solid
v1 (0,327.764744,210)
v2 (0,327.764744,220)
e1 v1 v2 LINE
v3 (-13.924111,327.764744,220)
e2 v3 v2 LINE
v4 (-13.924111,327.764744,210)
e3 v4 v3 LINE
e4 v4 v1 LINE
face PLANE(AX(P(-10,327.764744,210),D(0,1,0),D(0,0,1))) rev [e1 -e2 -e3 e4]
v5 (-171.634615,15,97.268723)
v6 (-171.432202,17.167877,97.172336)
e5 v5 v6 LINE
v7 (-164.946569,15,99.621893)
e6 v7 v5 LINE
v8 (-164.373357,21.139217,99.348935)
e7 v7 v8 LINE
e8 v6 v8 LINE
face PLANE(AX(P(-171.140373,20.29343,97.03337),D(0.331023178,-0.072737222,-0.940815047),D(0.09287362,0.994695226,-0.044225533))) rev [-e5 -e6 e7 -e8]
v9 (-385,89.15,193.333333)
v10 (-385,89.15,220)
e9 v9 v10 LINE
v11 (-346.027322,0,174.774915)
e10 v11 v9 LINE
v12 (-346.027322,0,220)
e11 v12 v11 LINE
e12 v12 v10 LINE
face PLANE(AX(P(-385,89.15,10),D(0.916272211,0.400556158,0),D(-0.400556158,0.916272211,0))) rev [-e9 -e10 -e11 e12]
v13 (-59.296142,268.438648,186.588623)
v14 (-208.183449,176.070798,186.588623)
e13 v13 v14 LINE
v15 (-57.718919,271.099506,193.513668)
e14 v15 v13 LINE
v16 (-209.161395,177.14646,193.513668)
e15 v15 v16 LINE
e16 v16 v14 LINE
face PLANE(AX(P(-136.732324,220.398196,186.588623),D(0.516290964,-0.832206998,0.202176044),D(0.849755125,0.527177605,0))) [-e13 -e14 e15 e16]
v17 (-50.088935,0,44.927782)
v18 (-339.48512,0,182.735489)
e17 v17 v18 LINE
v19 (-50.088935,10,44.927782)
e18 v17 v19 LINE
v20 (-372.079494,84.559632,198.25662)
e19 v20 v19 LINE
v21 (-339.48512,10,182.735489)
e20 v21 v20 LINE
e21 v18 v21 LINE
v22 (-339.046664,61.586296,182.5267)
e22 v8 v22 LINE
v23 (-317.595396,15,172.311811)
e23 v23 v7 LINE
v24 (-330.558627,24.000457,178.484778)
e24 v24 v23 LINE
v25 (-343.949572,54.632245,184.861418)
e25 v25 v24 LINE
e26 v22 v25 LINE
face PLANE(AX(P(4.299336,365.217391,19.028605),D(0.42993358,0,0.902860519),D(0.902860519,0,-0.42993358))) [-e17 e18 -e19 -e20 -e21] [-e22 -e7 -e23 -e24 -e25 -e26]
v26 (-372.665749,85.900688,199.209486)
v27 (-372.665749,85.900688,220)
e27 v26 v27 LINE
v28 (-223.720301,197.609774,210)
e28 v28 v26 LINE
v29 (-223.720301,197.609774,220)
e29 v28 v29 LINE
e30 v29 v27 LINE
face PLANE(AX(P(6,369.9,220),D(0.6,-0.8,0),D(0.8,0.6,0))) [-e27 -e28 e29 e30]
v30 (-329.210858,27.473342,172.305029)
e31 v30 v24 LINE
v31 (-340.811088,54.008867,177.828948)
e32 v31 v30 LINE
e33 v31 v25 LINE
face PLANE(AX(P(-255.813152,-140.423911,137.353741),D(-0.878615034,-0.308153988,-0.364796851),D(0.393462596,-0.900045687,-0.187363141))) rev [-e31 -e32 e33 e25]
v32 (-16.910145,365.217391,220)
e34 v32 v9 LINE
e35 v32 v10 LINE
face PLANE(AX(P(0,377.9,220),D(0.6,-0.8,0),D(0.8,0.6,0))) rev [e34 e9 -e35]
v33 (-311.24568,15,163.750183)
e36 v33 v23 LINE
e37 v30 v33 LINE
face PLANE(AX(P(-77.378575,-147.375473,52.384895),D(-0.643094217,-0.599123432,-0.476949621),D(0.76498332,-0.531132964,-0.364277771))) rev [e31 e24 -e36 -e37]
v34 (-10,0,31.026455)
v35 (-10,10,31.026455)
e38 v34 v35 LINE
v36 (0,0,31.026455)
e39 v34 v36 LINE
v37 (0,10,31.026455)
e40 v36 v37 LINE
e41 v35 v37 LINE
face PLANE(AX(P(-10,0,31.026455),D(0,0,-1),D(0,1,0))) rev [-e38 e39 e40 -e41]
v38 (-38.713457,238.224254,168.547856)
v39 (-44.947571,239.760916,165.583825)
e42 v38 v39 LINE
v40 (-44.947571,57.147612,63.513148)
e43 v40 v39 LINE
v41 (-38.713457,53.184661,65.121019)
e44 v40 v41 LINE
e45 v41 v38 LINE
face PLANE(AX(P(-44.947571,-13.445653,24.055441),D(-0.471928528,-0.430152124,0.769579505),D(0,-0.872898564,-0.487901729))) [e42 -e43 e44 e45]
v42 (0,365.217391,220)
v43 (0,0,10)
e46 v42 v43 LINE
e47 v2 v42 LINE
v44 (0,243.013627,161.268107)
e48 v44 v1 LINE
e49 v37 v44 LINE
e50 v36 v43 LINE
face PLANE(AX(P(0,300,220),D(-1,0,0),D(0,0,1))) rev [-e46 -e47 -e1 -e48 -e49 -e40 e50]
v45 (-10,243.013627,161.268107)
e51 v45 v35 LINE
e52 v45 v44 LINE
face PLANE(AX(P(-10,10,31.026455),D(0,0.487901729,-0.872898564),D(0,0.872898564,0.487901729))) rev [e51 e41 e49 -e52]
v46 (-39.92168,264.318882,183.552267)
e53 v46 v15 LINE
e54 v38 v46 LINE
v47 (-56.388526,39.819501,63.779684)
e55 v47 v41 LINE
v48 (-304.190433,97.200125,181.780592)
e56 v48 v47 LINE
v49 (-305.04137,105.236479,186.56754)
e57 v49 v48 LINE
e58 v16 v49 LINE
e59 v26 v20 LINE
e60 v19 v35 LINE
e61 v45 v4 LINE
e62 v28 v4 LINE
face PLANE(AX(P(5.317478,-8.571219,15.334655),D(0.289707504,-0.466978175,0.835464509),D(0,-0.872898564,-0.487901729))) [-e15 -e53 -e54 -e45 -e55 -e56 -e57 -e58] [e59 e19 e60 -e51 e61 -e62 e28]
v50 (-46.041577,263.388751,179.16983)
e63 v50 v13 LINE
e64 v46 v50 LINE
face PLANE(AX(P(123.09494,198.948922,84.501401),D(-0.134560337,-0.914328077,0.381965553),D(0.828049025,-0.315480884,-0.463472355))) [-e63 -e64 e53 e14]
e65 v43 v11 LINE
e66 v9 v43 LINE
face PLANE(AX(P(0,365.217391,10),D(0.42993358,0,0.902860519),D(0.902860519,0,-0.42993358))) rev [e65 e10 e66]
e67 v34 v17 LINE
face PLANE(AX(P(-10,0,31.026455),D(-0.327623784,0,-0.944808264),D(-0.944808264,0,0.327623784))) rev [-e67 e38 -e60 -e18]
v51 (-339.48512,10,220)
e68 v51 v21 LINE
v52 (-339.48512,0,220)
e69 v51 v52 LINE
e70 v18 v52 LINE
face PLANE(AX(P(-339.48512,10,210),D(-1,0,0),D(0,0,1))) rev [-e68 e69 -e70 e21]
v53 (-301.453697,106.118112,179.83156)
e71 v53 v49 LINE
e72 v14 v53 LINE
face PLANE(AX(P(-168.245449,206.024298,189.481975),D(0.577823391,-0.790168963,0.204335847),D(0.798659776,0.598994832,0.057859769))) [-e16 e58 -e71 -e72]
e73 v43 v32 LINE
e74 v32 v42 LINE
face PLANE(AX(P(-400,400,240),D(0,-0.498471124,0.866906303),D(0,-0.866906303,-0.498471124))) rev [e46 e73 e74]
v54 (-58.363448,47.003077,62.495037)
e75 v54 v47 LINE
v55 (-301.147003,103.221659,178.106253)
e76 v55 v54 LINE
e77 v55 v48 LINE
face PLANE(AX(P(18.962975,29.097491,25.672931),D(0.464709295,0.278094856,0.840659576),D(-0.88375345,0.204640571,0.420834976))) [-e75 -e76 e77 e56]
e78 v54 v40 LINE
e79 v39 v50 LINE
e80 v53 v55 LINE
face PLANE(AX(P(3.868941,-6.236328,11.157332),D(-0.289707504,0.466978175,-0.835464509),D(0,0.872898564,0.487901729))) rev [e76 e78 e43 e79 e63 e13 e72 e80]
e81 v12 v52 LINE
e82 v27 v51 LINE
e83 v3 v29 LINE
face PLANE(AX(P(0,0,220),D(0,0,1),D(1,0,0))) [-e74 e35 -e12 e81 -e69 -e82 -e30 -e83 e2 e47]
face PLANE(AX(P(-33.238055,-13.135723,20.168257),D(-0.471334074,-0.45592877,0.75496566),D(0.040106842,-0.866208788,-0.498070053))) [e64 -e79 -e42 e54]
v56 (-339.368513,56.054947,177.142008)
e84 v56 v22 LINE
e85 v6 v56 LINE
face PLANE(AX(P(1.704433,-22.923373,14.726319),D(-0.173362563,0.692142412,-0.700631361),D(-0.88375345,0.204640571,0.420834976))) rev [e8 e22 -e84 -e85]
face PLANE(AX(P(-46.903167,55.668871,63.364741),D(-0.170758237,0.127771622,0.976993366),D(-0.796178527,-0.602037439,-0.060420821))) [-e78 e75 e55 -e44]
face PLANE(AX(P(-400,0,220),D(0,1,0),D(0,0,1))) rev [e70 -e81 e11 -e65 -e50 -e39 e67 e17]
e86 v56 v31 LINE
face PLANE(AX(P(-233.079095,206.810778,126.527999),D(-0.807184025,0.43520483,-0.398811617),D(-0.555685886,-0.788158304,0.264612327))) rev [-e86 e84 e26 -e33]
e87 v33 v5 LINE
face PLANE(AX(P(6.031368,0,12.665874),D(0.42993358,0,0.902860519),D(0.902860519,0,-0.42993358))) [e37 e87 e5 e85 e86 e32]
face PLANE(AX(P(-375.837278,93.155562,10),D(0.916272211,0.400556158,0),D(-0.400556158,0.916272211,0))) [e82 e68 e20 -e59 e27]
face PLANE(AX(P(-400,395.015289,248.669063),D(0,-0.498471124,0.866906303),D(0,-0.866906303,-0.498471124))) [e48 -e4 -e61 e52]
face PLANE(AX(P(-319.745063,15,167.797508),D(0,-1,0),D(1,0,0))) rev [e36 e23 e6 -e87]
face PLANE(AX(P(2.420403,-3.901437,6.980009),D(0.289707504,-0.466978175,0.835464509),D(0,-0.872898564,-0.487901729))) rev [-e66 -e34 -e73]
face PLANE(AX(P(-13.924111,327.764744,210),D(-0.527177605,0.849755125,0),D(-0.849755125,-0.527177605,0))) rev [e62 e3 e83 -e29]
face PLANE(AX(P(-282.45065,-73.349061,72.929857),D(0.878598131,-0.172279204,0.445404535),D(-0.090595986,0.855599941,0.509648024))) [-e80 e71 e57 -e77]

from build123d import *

# Parameters (mm, degrees)
BOSS_EXTRU_1_DEPTH       = 220
ENL_V_MAT_EXTRU_1_DEPTH  = 593.628391152
ENL_V_MAT_EXTRU_7_DEPTH  = 585.622735541
ENL_V_MAT_EXTRU_8_DEPTH  = 581.933509888
ENL_V_MAT_EXTRU_9_DEPTH  = 576.952076714
COQUE2_T                 = 10
ENL_V_MAT_EXTRU_10_DEPTH = 10
ENL_V_MAT_EXTRU_11_DEPTH = 10
ENL_V_MAT_EXTRU_12_DEPTH = 10
ENL_V_MAT_EXTRU_13_DEPTH = 5
ENL_V_MAT_EXTRU_14_DEPTH = 5
CHANFREIN1_SIZE          = 5


with BuildPart() as part:
    # Esquisse1 → Boss.-Extru.1 (new body)
    with BuildSketch(Plane.XY):
        Polygon((0, 0), (0, 300), (0, 377.9), (-400, 77.9), (-400, 0), align=None)
    extrude(amount=BOSS_EXTRU_1_DEPTH)

    # Esquisse2 → Enlèv. mat.-Extru.1 (cut, through all)
    with BuildSketch(Plane(origin=(0, 0, 0), x_dir=(0, 0, -1), z_dir=(1, 0, 0))):
        Polygon((-240, 400), (-10, 0), (0, 0), (0, 377.9), (0, 400), align=None)
    extrude(amount=-ENL_V_MAT_EXTRU_1_DEPTH, mode=Mode.SUBTRACT)

    # Esquisse9 → Enlèv. mat.-Extru.7 (cut, through all)
    with BuildSketch(Plane(origin=(0, 0, 0), x_dir=(-1, 0, 0), z_dir=(0, -1, 0))):
        Polygon((0, -10), (546, -270), (546, -10), align=None)
    extrude(amount=-ENL_V_MAT_EXTRU_7_DEPTH, mode=Mode.SUBTRACT)

    # Esquisse10 → Enlèv. mat.-Extru.8 (cut, through all)
    with BuildSketch(Plane.XY.offset(220)):
        Polygon((-400, 77.9), (-385, 89.15), (15, -825.85), (-400, -825.85), align=None)
    extrude(amount=-ENL_V_MAT_EXTRU_8_DEPTH, mode=Mode.SUBTRACT)

    # Esquisse11 → Enlèv. mat.-Extru.9 (cut, through all)
    with BuildSketch(Plane(origin=(2.420403375, -3.901436921, 6.980009459), x_dir=(-0.957115229324862, -0.14134879209424664, 0.25288526403868283), z_dir=(-0.2897075038628045, 0.46697817542256076, -0.8354645090514613))):
        Polygon((411.522876563, 185.157287383), (386.822778124, 107.338380422), (375.386020672, 85.272983458), (2.52885264, 4.879017292), (4.011720976, 426.13611676), (20.196678216, 426.13611676), align=None)
    extrude(amount=ENL_V_MAT_EXTRU_9_DEPTH, mode=Mode.SUBTRACT)

    # Coque2 (no face opened: a closed hollow body)
    add(offset(amount=-COQUE2_T, mode=Mode.PRIVATE), mode=Mode.SUBTRACT)

    # Esquisse12 → Enlèv. mat.-Extru.10 (cut)
    with BuildSketch(Plane(origin=(0, 0, 0), x_dir=(0, 0, -1), z_dir=(1, 0, 0))):
        Polygon((-220, 0), (-31.026454867, 0), (-31.026454867, 10), (-161.268107242, 243.013626517), (-210, 327.764744356), (-220, 327.764744356), align=None)
    extrude(amount=-ENL_V_MAT_EXTRU_10_DEPTH, mode=Mode.SUBTRACT)

    # Esquisse13 → Enlèv. mat.-Extru.11 (cut)
    with BuildSketch(Plane.XY.offset(220)):
        Polygon((-10, 327.764744356), (-13.924111282, 327.764744356), (-223.720300682, 197.609774488), (-372.665748674, 85.900688494), (-339.485119824, 10), (-339.485119824, 0), (0, 0), (0, 327.764744356), align=None)
    extrude(amount=-ENL_V_MAT_EXTRU_11_DEPTH, mode=Mode.SUBTRACT)

    # Esquisse14 → Enlèv. mat.-Extru.12 (cut)
    with BuildSketch(Plane(origin=(0, 10, 0), x_dir=(1, 0, 0), z_dir=(0, 1, 0))):
        Polygon((-10, -31.026454867), (-50.088935394, -44.927781949), (-339.485119824, -182.735488821), (-339.485119824, -210), (-10, -210), align=None)
    extrude(amount=-ENL_V_MAT_EXTRU_12_DEPTH, mode=Mode.SUBTRACT)

    # Esquisse15 → Enlèv. mat.-Extru.13 (cut)
    with BuildSketch(Plane(origin=(5.317478413, -8.571218675, 15.334654549), x_dir=(0.957115229324862, 0.14134879209424633, -0.25288526403868294), z_dir=(0.2897075038628044, -0.4669781754225606, 0.8354645090514614))):
        Polygon((-47.266156251, 320.279040761), (-65.860823636, 331.058022207), (-224.088873852, 249.046543535), (-324.264873355, 182.887396388), (-323.375809314, 173.536914552), (-64.470820642, 65.876603428), (-46.003797604, 78.19747196), (-46.003797604, 290.180399582), align=None)
    extrude(amount=-ENL_V_MAT_EXTRU_13_DEPTH, mode=Mode.SUBTRACT)

    # Esquisse16 → Enlèv. mat.-Extru.14 (cut)
    with BuildSketch(Plane(origin=(8.181036358, 0, 17.180176353), x_dir=(0.9028605188239304, 0, -0.4299335803923476), z_dir=(0.4299335803923476, 0, 0.9028605188239304))):
        Polygon((-191.754542227, 15), (-191.119657804, 21.139217145), (-384.586204292, 61.586295788), (-390.01662066, 54.63224463), (-375.184932722, 24.000456874), (-360.826977231, 15), align=None)
    extrude(amount=-ENL_V_MAT_EXTRU_14_DEPTH, mode=Mode.SUBTRACT)

    # Chanfrein1
    # the kernel refuses this chamfer: 5 mm, written as the material it adds along each edge
    with BuildSketch(Plane(origin=(-40.161994399, 44.295460011, 54.670053412), x_dir=(0.3159146926025526, -0.462915109925161, 0.8281953320327342), z_dir=(0, 0.8728985637819059, 0.48790172919091623))) as chanfrein1_piece_1_section:
        Polygon((CHANFREIN1_SIZE * 0.999621916911, -CHANFREIN1_SIZE * 0.0274958766106), (-CHANFREIN1_SIZE * 0.0274958766106, -CHANFREIN1_SIZE * 0.999621916911), (0, 0), align=None)
    chanfrein1_piece_1 = extrude(amount=237.699757502, mode=Mode.PRIVATE)
    chanfrein1_piece_1 = split(chanfrein1_piece_1, bisect_by=Plane(origin=(-40.208550671, 46.8969516, 62.124981095), z_dir=(-0.2897075038628046, 0.46697817542256076, -0.8354645090514613)), keep=Keep.TOP, mode=Mode.PRIVATE)
    add(chanfrein1_piece_1)
    with BuildSketch(Plane(origin=(-68.07465725, 34.413144895, 58.825445246), x_dir=(0.30420367327836906, -0.4846099980151233, 0.8201300354137321), z_dir=(0.7961785265635489, 0.602037439248781, 0.060420820764590655))) as chanfrein1_piece_2_section:
        Polygon((CHANFREIN1_SIZE * 0.999621916911, -CHANFREIN1_SIZE * 0.0274958766106), (-CHANFREIN1_SIZE * 0.0274958766106, -CHANFREIN1_SIZE * 0.999621916911), (0, 0), align=None)
    chanfrein1_piece_2 = extrude(amount=47.916711439, mode=Mode.PRIVATE)
    chanfrein1_piece_2 = split(chanfrein1_piece_2, bisect_by=Plane(origin=(-62.751981741, 36.64687929, 64.212970543), z_dir=(-0.2897075038628046, 0.46697817542256076, -0.8354645090514613)), keep=Keep.TOP, mode=Mode.PRIVATE)
    add(chanfrein1_piece_2)
    with BuildSketch(Plane(origin=(-317.002639554, 102.166369021, 183.014540357), x_dir=(0.27949349185715106, -0.4904553232059303, 0.8254313805207935), z_dir=(0.8837534495057562, -0.20464057148945075, -0.42083497595512176))) as chanfrein1_piece_3_section:
        Polygon((CHANFREIN1_SIZE * 0.999621916911, -CHANFREIN1_SIZE * 0.0274958766106), (-CHANFREIN1_SIZE * 0.0274958766106, -CHANFREIN1_SIZE * 0.999621916911), (0, 0), align=None)
    chanfrein1_piece_3 = extrude(amount=306.113933558, mode=Mode.PRIVATE)
    chanfrein1_piece_3 = split(chanfrein1_piece_3, bisect_by=Plane(origin=(-309.662798292, 99.962525559, 185.222229721), z_dir=(-0.2897075038628046, 0.46697817542256076, -0.8354645090514613)), keep=Keep.TOP, mode=Mode.PRIVATE)
    add(chanfrein1_piece_3)
    with BuildSketch(Plane(origin=(-307.65482851, 118.573028738, 188.943482833), x_dir=(0.2633994072478335, -0.4729425091279115, 0.8408008892248422), z_dir=(0.09059598606414514, -0.8555999408705789, -0.5096480241218712))) as chanfrein1_piece_4_section:
        Polygon((CHANFREIN1_SIZE * 0.999621916911, -CHANFREIN1_SIZE * 0.0274958766106), (-CHANFREIN1_SIZE * 0.0274958766106, -CHANFREIN1_SIZE * 0.999621916911), (0, 0), align=None)
    chanfrein1_piece_4 = extrude(amount=35.10948368, mode=Mode.PRIVATE)
    chanfrein1_piece_4 = split(chanfrein1_piece_4, bisect_by=Plane(origin=(-304.154916551, 111.450481176, 189.733432581), z_dir=(-0.2897075038628046, 0.46697817542256076, -0.8354645090514613)), keep=Keep.TOP, mode=Mode.PRIVATE)
    add(chanfrein1_piece_4)
    with BuildSketch(Plane(origin=(-200.340434194, 187.183474827, 190.080330196), x_dir=(0.27509504551843234, -0.44891584015791836, 0.8501748551836392), z_dir=(-0.7986597762217562, -0.5989948321663171, -0.05785976912726176))) as chanfrein1_piece_5_section:
        Polygon((CHANFREIN1_SIZE * 0.999621916911, -CHANFREIN1_SIZE * 0.0274958766106), (-CHANFREIN1_SIZE * 0.0274958766106, -CHANFREIN1_SIZE * 0.999621916911), (0, 0), align=None)
    chanfrein1_piece_5 = extrude(amount=145.767917453, mode=Mode.PRIVATE)
    chanfrein1_piece_5 = split(chanfrein1_piece_5, bisect_by=Plane(origin=(-202.533814806, 181.753905632, 193.790779261), z_dir=(-0.2897075038628046, 0.46697817542256076, -0.8354645090514613)), keep=Keep.TOP, mode=Mode.PRIVATE)
    add(chanfrein1_piece_5)
    with BuildSketch(Plane(origin=(-48.240952428, 280.213064842, 189.336345276), x_dir=(0.2774877365282881, -0.4472811894008833, 0.8502588392275253), z_dir=(-0.8497551250873772, -0.5271776051652194, 0))) as chanfrein1_piece_6_section:
        Polygon((CHANFREIN1_SIZE * 0.999621916911, -CHANFREIN1_SIZE * 0.0274958766106), (-CHANFREIN1_SIZE * 0.0274958766106, -CHANFREIN1_SIZE * 0.999621916911), (0, 0), align=None)
    chanfrein1_piece_6 = extrude(amount=203.93579214, mode=Mode.PRIVATE)
    chanfrein1_piece_6 = split(chanfrein1_piece_6, bisect_by=Plane(origin=(-51.141678834, 273.639790239, 192.652807431), z_dir=(-0.2897075038628046, 0.46697817542256076, -0.8354645090514613)), keep=Keep.TOP, mode=Mode.PRIVATE)
    add(chanfrein1_piece_6)
    with BuildSketch(Plane(origin=(-30.722819132, 262.597188686, 173.415424362), x_dir=(0.30279611641961773, -0.4440879078496585, 0.8432677166730093), z_dir=(-0.8280490249451176, 0.31548088408434294, 0.46347235523254393))) as chanfrein1_piece_7_section:
        Polygon((CHANFREIN1_SIZE * 0.999621916911, -CHANFREIN1_SIZE * 0.0274958766106), (-CHANFREIN1_SIZE * 0.0274958766106, -CHANFREIN1_SIZE * 0.999621916911), (0, 0), align=None)
    chanfrein1_piece_7 = extrude(amount=47.209807713, mode=Mode.PRIVATE)
    chanfrein1_piece_7 = split(chanfrein1_piece_7, bisect_by=Plane(origin=(-34.936696237, 260.839111264, 179.878664837), z_dir=(-0.2897075038628046, 0.46697817542256076, -0.8354645090514613)), keep=Keep.TOP, mode=Mode.PRIVATE)
    add(chanfrein1_piece_7)
    with BuildSketch(Plane(origin=(-39.646283985, 229.421072997, 157.966141832), x_dir=(0.31589157722178685, -0.46191278396742486, 0.8287635920139076), z_dir=(-0.04010684179965448, 0.8662087875824183, 0.498070052859891))) as chanfrein1_piece_8_section:
        Polygon((CHANFREIN1_SIZE * 0.999621916911, -CHANFREIN1_SIZE * 0.0274958766106), (-CHANFREIN1_SIZE * 0.0274958766106, -CHANFREIN1_SIZE * 0.999621916911), (0, 0), align=None)
    chanfrein1_piece_8 = extrude(amount=55.841931543, mode=Mode.PRIVATE)
    chanfrein1_piece_8 = split(chanfrein1_piece_8, bisect_by=Plane(origin=(-38.499704125, 231.686313872, 164.819389576), z_dir=(-0.2897075038628046, 0.46697817542256076, -0.8354645090514613)), keep=Keep.TOP, mode=Mode.PRIVATE)
    add(chanfrein1_piece_8)
    with BuildSketch(Plane(origin=(-342.544767506, 30.829984913, 178.654509931), x_dir=(0.41658568505778765, -0.023296939600526662, 0.9087978981105664), z_dir=(0.7649833199588183, -0.5311329639949918, -0.36427777140896095))) as chanfrein1_piece_9_section:
        Polygon((CHANFREIN1_SIZE * 0.999621916911, -CHANFREIN1_SIZE * 0.0274958766106), (-CHANFREIN1_SIZE * 0.0274958766106, -CHANFREIN1_SIZE * 0.999621916911), (0, 0), align=None)
    chanfrein1_piece_9 = extrude(amount=42.662599553, mode=Mode.PRIVATE)
    chanfrein1_piece_9 = split(chanfrein1_piece_9, bisect_by=Plane(origin=(-335.660362509, 29.200535476, 180.914175814), z_dir=(-0.42993358039234775, 0, -0.9028605188239304)), keep=Keep.TOP, mode=Mode.PRIVATE)
    add(chanfrein1_piece_9)
    with BuildSketch(Plane(origin=(-351.15854534, 66.205405543, 182.7563089), x_dir=(0.40742744830986827, -0.011982580645932633, 0.9131589632286229), z_dir=(0.3934625955758405, -0.9000456873797399, -0.18736314075040017))) as chanfrein1_piece_10_section:
        Polygon((CHANFREIN1_SIZE * 0.999621916911, -CHANFREIN1_SIZE * 0.0274958766106), (-CHANFREIN1_SIZE * 0.0274958766106, -CHANFREIN1_SIZE * 0.999621916911), (0, 0), align=None)
    chanfrein1_piece_10 = extrude(amount=59.750421935, mode=Mode.PRIVATE)
    chanfrein1_piece_10 = split(chanfrein1_piece_10, bisect_by=Plane(origin=(-345.34283002, 61.461742689, 185.524874628), z_dir=(-0.42993358039234775, 0, -0.9028605188239304)), keep=Keep.TOP, mode=Mode.PRIVATE)
    add(chanfrein1_piece_10)
    with BuildSketch(Plane(origin=(-334.051091784, 71.720762303, 174.609902444), x_dir=(0.41020504604213787, 0.01692295790963476, 0.911836297641828), z_dir=(-0.5556858860955991, -0.7881583042423078, 0.2646123267121899))) as chanfrein1_piece_11_section:
        Polygon((CHANFREIN1_SIZE * 0.999621916911, -CHANFREIN1_SIZE * 0.0274958766106), (-CHANFREIN1_SIZE * 0.0274958766106, -CHANFREIN1_SIZE * 0.999621916911), (0, 0), align=None)
    chanfrein1_piece_11 = extrude(amount=34.53999538, mode=Mode.PRIVATE)
    chanfrein1_piece_11 = split(chanfrein1_piece_11, bisect_by=Plane(origin=(-334.127686144, 65.984062058, 180.184329926), z_dir=(-0.42993358039234775, 0, -0.9028605188239304)), keep=Keep.TOP, mode=Mode.PRIVATE)
    add(chanfrein1_piece_11)
    with BuildSketch(Plane(origin=(-155.159356387, 18.507863763, 89.423361779), x_dir=(0.43485121997615706, 0.02691398648535738, 0.900100024339914), z_dir=(-0.8837534495057563, 0.20464057148945047, 0.42083497595512187))) as chanfrein1_piece_12_section:
        Polygon((CHANFREIN1_SIZE * 0.999621916911, -CHANFREIN1_SIZE * 0.0274958766106), (-CHANFREIN1_SIZE * 0.0274958766106, -CHANFREIN1_SIZE * 0.999621916911), (0, 0), align=None)
    chanfrein1_piece_12 = extrude(amount=223.366193099, mode=Mode.PRIVATE)
    chanfrein1_piece_12 = split(chanfrein1_piece_12, bisect_by=Plane(origin=(-158.919465377, 18.201780851, 96.751843846), z_dir=(-0.42993358039234775, 0, -0.9028605188239304)), keep=Keep.TOP, mode=Mode.PRIVATE)
    add(chanfrein1_piece_12)
    with BuildSketch(Plane(origin=(-168.290444566, 2.209796043, 95.676260912), x_dir=(0.45446428049870663, -0.002828389920449722, 0.8907604717101286), z_dir=(0.09287361982234821, 0.9946952261622446, -0.04422553324873722))) as chanfrein1_piece_13_section:
        Polygon((CHANFREIN1_SIZE * 0.999621916911, -CHANFREIN1_SIZE * 0.0274958766106), (-CHANFREIN1_SIZE * 0.0274958766106, -CHANFREIN1_SIZE * 0.999621916911), (0, 0), align=None)
    chanfrein1_piece_13 = extrude(amount=31.888787866, mode=Mode.PRIVATE)
    chanfrein1_piece_13 = split(chanfrein1_piece_13, bisect_by=Plane(origin=(-167.023575776, 8.689202011, 100.610944036), z_dir=(-0.42993358039234775, 0, -0.9028605188239304)), keep=Keep.TOP, mode=Mode.PRIVATE)
    add(chanfrein1_piece_13)


solid = part.part
